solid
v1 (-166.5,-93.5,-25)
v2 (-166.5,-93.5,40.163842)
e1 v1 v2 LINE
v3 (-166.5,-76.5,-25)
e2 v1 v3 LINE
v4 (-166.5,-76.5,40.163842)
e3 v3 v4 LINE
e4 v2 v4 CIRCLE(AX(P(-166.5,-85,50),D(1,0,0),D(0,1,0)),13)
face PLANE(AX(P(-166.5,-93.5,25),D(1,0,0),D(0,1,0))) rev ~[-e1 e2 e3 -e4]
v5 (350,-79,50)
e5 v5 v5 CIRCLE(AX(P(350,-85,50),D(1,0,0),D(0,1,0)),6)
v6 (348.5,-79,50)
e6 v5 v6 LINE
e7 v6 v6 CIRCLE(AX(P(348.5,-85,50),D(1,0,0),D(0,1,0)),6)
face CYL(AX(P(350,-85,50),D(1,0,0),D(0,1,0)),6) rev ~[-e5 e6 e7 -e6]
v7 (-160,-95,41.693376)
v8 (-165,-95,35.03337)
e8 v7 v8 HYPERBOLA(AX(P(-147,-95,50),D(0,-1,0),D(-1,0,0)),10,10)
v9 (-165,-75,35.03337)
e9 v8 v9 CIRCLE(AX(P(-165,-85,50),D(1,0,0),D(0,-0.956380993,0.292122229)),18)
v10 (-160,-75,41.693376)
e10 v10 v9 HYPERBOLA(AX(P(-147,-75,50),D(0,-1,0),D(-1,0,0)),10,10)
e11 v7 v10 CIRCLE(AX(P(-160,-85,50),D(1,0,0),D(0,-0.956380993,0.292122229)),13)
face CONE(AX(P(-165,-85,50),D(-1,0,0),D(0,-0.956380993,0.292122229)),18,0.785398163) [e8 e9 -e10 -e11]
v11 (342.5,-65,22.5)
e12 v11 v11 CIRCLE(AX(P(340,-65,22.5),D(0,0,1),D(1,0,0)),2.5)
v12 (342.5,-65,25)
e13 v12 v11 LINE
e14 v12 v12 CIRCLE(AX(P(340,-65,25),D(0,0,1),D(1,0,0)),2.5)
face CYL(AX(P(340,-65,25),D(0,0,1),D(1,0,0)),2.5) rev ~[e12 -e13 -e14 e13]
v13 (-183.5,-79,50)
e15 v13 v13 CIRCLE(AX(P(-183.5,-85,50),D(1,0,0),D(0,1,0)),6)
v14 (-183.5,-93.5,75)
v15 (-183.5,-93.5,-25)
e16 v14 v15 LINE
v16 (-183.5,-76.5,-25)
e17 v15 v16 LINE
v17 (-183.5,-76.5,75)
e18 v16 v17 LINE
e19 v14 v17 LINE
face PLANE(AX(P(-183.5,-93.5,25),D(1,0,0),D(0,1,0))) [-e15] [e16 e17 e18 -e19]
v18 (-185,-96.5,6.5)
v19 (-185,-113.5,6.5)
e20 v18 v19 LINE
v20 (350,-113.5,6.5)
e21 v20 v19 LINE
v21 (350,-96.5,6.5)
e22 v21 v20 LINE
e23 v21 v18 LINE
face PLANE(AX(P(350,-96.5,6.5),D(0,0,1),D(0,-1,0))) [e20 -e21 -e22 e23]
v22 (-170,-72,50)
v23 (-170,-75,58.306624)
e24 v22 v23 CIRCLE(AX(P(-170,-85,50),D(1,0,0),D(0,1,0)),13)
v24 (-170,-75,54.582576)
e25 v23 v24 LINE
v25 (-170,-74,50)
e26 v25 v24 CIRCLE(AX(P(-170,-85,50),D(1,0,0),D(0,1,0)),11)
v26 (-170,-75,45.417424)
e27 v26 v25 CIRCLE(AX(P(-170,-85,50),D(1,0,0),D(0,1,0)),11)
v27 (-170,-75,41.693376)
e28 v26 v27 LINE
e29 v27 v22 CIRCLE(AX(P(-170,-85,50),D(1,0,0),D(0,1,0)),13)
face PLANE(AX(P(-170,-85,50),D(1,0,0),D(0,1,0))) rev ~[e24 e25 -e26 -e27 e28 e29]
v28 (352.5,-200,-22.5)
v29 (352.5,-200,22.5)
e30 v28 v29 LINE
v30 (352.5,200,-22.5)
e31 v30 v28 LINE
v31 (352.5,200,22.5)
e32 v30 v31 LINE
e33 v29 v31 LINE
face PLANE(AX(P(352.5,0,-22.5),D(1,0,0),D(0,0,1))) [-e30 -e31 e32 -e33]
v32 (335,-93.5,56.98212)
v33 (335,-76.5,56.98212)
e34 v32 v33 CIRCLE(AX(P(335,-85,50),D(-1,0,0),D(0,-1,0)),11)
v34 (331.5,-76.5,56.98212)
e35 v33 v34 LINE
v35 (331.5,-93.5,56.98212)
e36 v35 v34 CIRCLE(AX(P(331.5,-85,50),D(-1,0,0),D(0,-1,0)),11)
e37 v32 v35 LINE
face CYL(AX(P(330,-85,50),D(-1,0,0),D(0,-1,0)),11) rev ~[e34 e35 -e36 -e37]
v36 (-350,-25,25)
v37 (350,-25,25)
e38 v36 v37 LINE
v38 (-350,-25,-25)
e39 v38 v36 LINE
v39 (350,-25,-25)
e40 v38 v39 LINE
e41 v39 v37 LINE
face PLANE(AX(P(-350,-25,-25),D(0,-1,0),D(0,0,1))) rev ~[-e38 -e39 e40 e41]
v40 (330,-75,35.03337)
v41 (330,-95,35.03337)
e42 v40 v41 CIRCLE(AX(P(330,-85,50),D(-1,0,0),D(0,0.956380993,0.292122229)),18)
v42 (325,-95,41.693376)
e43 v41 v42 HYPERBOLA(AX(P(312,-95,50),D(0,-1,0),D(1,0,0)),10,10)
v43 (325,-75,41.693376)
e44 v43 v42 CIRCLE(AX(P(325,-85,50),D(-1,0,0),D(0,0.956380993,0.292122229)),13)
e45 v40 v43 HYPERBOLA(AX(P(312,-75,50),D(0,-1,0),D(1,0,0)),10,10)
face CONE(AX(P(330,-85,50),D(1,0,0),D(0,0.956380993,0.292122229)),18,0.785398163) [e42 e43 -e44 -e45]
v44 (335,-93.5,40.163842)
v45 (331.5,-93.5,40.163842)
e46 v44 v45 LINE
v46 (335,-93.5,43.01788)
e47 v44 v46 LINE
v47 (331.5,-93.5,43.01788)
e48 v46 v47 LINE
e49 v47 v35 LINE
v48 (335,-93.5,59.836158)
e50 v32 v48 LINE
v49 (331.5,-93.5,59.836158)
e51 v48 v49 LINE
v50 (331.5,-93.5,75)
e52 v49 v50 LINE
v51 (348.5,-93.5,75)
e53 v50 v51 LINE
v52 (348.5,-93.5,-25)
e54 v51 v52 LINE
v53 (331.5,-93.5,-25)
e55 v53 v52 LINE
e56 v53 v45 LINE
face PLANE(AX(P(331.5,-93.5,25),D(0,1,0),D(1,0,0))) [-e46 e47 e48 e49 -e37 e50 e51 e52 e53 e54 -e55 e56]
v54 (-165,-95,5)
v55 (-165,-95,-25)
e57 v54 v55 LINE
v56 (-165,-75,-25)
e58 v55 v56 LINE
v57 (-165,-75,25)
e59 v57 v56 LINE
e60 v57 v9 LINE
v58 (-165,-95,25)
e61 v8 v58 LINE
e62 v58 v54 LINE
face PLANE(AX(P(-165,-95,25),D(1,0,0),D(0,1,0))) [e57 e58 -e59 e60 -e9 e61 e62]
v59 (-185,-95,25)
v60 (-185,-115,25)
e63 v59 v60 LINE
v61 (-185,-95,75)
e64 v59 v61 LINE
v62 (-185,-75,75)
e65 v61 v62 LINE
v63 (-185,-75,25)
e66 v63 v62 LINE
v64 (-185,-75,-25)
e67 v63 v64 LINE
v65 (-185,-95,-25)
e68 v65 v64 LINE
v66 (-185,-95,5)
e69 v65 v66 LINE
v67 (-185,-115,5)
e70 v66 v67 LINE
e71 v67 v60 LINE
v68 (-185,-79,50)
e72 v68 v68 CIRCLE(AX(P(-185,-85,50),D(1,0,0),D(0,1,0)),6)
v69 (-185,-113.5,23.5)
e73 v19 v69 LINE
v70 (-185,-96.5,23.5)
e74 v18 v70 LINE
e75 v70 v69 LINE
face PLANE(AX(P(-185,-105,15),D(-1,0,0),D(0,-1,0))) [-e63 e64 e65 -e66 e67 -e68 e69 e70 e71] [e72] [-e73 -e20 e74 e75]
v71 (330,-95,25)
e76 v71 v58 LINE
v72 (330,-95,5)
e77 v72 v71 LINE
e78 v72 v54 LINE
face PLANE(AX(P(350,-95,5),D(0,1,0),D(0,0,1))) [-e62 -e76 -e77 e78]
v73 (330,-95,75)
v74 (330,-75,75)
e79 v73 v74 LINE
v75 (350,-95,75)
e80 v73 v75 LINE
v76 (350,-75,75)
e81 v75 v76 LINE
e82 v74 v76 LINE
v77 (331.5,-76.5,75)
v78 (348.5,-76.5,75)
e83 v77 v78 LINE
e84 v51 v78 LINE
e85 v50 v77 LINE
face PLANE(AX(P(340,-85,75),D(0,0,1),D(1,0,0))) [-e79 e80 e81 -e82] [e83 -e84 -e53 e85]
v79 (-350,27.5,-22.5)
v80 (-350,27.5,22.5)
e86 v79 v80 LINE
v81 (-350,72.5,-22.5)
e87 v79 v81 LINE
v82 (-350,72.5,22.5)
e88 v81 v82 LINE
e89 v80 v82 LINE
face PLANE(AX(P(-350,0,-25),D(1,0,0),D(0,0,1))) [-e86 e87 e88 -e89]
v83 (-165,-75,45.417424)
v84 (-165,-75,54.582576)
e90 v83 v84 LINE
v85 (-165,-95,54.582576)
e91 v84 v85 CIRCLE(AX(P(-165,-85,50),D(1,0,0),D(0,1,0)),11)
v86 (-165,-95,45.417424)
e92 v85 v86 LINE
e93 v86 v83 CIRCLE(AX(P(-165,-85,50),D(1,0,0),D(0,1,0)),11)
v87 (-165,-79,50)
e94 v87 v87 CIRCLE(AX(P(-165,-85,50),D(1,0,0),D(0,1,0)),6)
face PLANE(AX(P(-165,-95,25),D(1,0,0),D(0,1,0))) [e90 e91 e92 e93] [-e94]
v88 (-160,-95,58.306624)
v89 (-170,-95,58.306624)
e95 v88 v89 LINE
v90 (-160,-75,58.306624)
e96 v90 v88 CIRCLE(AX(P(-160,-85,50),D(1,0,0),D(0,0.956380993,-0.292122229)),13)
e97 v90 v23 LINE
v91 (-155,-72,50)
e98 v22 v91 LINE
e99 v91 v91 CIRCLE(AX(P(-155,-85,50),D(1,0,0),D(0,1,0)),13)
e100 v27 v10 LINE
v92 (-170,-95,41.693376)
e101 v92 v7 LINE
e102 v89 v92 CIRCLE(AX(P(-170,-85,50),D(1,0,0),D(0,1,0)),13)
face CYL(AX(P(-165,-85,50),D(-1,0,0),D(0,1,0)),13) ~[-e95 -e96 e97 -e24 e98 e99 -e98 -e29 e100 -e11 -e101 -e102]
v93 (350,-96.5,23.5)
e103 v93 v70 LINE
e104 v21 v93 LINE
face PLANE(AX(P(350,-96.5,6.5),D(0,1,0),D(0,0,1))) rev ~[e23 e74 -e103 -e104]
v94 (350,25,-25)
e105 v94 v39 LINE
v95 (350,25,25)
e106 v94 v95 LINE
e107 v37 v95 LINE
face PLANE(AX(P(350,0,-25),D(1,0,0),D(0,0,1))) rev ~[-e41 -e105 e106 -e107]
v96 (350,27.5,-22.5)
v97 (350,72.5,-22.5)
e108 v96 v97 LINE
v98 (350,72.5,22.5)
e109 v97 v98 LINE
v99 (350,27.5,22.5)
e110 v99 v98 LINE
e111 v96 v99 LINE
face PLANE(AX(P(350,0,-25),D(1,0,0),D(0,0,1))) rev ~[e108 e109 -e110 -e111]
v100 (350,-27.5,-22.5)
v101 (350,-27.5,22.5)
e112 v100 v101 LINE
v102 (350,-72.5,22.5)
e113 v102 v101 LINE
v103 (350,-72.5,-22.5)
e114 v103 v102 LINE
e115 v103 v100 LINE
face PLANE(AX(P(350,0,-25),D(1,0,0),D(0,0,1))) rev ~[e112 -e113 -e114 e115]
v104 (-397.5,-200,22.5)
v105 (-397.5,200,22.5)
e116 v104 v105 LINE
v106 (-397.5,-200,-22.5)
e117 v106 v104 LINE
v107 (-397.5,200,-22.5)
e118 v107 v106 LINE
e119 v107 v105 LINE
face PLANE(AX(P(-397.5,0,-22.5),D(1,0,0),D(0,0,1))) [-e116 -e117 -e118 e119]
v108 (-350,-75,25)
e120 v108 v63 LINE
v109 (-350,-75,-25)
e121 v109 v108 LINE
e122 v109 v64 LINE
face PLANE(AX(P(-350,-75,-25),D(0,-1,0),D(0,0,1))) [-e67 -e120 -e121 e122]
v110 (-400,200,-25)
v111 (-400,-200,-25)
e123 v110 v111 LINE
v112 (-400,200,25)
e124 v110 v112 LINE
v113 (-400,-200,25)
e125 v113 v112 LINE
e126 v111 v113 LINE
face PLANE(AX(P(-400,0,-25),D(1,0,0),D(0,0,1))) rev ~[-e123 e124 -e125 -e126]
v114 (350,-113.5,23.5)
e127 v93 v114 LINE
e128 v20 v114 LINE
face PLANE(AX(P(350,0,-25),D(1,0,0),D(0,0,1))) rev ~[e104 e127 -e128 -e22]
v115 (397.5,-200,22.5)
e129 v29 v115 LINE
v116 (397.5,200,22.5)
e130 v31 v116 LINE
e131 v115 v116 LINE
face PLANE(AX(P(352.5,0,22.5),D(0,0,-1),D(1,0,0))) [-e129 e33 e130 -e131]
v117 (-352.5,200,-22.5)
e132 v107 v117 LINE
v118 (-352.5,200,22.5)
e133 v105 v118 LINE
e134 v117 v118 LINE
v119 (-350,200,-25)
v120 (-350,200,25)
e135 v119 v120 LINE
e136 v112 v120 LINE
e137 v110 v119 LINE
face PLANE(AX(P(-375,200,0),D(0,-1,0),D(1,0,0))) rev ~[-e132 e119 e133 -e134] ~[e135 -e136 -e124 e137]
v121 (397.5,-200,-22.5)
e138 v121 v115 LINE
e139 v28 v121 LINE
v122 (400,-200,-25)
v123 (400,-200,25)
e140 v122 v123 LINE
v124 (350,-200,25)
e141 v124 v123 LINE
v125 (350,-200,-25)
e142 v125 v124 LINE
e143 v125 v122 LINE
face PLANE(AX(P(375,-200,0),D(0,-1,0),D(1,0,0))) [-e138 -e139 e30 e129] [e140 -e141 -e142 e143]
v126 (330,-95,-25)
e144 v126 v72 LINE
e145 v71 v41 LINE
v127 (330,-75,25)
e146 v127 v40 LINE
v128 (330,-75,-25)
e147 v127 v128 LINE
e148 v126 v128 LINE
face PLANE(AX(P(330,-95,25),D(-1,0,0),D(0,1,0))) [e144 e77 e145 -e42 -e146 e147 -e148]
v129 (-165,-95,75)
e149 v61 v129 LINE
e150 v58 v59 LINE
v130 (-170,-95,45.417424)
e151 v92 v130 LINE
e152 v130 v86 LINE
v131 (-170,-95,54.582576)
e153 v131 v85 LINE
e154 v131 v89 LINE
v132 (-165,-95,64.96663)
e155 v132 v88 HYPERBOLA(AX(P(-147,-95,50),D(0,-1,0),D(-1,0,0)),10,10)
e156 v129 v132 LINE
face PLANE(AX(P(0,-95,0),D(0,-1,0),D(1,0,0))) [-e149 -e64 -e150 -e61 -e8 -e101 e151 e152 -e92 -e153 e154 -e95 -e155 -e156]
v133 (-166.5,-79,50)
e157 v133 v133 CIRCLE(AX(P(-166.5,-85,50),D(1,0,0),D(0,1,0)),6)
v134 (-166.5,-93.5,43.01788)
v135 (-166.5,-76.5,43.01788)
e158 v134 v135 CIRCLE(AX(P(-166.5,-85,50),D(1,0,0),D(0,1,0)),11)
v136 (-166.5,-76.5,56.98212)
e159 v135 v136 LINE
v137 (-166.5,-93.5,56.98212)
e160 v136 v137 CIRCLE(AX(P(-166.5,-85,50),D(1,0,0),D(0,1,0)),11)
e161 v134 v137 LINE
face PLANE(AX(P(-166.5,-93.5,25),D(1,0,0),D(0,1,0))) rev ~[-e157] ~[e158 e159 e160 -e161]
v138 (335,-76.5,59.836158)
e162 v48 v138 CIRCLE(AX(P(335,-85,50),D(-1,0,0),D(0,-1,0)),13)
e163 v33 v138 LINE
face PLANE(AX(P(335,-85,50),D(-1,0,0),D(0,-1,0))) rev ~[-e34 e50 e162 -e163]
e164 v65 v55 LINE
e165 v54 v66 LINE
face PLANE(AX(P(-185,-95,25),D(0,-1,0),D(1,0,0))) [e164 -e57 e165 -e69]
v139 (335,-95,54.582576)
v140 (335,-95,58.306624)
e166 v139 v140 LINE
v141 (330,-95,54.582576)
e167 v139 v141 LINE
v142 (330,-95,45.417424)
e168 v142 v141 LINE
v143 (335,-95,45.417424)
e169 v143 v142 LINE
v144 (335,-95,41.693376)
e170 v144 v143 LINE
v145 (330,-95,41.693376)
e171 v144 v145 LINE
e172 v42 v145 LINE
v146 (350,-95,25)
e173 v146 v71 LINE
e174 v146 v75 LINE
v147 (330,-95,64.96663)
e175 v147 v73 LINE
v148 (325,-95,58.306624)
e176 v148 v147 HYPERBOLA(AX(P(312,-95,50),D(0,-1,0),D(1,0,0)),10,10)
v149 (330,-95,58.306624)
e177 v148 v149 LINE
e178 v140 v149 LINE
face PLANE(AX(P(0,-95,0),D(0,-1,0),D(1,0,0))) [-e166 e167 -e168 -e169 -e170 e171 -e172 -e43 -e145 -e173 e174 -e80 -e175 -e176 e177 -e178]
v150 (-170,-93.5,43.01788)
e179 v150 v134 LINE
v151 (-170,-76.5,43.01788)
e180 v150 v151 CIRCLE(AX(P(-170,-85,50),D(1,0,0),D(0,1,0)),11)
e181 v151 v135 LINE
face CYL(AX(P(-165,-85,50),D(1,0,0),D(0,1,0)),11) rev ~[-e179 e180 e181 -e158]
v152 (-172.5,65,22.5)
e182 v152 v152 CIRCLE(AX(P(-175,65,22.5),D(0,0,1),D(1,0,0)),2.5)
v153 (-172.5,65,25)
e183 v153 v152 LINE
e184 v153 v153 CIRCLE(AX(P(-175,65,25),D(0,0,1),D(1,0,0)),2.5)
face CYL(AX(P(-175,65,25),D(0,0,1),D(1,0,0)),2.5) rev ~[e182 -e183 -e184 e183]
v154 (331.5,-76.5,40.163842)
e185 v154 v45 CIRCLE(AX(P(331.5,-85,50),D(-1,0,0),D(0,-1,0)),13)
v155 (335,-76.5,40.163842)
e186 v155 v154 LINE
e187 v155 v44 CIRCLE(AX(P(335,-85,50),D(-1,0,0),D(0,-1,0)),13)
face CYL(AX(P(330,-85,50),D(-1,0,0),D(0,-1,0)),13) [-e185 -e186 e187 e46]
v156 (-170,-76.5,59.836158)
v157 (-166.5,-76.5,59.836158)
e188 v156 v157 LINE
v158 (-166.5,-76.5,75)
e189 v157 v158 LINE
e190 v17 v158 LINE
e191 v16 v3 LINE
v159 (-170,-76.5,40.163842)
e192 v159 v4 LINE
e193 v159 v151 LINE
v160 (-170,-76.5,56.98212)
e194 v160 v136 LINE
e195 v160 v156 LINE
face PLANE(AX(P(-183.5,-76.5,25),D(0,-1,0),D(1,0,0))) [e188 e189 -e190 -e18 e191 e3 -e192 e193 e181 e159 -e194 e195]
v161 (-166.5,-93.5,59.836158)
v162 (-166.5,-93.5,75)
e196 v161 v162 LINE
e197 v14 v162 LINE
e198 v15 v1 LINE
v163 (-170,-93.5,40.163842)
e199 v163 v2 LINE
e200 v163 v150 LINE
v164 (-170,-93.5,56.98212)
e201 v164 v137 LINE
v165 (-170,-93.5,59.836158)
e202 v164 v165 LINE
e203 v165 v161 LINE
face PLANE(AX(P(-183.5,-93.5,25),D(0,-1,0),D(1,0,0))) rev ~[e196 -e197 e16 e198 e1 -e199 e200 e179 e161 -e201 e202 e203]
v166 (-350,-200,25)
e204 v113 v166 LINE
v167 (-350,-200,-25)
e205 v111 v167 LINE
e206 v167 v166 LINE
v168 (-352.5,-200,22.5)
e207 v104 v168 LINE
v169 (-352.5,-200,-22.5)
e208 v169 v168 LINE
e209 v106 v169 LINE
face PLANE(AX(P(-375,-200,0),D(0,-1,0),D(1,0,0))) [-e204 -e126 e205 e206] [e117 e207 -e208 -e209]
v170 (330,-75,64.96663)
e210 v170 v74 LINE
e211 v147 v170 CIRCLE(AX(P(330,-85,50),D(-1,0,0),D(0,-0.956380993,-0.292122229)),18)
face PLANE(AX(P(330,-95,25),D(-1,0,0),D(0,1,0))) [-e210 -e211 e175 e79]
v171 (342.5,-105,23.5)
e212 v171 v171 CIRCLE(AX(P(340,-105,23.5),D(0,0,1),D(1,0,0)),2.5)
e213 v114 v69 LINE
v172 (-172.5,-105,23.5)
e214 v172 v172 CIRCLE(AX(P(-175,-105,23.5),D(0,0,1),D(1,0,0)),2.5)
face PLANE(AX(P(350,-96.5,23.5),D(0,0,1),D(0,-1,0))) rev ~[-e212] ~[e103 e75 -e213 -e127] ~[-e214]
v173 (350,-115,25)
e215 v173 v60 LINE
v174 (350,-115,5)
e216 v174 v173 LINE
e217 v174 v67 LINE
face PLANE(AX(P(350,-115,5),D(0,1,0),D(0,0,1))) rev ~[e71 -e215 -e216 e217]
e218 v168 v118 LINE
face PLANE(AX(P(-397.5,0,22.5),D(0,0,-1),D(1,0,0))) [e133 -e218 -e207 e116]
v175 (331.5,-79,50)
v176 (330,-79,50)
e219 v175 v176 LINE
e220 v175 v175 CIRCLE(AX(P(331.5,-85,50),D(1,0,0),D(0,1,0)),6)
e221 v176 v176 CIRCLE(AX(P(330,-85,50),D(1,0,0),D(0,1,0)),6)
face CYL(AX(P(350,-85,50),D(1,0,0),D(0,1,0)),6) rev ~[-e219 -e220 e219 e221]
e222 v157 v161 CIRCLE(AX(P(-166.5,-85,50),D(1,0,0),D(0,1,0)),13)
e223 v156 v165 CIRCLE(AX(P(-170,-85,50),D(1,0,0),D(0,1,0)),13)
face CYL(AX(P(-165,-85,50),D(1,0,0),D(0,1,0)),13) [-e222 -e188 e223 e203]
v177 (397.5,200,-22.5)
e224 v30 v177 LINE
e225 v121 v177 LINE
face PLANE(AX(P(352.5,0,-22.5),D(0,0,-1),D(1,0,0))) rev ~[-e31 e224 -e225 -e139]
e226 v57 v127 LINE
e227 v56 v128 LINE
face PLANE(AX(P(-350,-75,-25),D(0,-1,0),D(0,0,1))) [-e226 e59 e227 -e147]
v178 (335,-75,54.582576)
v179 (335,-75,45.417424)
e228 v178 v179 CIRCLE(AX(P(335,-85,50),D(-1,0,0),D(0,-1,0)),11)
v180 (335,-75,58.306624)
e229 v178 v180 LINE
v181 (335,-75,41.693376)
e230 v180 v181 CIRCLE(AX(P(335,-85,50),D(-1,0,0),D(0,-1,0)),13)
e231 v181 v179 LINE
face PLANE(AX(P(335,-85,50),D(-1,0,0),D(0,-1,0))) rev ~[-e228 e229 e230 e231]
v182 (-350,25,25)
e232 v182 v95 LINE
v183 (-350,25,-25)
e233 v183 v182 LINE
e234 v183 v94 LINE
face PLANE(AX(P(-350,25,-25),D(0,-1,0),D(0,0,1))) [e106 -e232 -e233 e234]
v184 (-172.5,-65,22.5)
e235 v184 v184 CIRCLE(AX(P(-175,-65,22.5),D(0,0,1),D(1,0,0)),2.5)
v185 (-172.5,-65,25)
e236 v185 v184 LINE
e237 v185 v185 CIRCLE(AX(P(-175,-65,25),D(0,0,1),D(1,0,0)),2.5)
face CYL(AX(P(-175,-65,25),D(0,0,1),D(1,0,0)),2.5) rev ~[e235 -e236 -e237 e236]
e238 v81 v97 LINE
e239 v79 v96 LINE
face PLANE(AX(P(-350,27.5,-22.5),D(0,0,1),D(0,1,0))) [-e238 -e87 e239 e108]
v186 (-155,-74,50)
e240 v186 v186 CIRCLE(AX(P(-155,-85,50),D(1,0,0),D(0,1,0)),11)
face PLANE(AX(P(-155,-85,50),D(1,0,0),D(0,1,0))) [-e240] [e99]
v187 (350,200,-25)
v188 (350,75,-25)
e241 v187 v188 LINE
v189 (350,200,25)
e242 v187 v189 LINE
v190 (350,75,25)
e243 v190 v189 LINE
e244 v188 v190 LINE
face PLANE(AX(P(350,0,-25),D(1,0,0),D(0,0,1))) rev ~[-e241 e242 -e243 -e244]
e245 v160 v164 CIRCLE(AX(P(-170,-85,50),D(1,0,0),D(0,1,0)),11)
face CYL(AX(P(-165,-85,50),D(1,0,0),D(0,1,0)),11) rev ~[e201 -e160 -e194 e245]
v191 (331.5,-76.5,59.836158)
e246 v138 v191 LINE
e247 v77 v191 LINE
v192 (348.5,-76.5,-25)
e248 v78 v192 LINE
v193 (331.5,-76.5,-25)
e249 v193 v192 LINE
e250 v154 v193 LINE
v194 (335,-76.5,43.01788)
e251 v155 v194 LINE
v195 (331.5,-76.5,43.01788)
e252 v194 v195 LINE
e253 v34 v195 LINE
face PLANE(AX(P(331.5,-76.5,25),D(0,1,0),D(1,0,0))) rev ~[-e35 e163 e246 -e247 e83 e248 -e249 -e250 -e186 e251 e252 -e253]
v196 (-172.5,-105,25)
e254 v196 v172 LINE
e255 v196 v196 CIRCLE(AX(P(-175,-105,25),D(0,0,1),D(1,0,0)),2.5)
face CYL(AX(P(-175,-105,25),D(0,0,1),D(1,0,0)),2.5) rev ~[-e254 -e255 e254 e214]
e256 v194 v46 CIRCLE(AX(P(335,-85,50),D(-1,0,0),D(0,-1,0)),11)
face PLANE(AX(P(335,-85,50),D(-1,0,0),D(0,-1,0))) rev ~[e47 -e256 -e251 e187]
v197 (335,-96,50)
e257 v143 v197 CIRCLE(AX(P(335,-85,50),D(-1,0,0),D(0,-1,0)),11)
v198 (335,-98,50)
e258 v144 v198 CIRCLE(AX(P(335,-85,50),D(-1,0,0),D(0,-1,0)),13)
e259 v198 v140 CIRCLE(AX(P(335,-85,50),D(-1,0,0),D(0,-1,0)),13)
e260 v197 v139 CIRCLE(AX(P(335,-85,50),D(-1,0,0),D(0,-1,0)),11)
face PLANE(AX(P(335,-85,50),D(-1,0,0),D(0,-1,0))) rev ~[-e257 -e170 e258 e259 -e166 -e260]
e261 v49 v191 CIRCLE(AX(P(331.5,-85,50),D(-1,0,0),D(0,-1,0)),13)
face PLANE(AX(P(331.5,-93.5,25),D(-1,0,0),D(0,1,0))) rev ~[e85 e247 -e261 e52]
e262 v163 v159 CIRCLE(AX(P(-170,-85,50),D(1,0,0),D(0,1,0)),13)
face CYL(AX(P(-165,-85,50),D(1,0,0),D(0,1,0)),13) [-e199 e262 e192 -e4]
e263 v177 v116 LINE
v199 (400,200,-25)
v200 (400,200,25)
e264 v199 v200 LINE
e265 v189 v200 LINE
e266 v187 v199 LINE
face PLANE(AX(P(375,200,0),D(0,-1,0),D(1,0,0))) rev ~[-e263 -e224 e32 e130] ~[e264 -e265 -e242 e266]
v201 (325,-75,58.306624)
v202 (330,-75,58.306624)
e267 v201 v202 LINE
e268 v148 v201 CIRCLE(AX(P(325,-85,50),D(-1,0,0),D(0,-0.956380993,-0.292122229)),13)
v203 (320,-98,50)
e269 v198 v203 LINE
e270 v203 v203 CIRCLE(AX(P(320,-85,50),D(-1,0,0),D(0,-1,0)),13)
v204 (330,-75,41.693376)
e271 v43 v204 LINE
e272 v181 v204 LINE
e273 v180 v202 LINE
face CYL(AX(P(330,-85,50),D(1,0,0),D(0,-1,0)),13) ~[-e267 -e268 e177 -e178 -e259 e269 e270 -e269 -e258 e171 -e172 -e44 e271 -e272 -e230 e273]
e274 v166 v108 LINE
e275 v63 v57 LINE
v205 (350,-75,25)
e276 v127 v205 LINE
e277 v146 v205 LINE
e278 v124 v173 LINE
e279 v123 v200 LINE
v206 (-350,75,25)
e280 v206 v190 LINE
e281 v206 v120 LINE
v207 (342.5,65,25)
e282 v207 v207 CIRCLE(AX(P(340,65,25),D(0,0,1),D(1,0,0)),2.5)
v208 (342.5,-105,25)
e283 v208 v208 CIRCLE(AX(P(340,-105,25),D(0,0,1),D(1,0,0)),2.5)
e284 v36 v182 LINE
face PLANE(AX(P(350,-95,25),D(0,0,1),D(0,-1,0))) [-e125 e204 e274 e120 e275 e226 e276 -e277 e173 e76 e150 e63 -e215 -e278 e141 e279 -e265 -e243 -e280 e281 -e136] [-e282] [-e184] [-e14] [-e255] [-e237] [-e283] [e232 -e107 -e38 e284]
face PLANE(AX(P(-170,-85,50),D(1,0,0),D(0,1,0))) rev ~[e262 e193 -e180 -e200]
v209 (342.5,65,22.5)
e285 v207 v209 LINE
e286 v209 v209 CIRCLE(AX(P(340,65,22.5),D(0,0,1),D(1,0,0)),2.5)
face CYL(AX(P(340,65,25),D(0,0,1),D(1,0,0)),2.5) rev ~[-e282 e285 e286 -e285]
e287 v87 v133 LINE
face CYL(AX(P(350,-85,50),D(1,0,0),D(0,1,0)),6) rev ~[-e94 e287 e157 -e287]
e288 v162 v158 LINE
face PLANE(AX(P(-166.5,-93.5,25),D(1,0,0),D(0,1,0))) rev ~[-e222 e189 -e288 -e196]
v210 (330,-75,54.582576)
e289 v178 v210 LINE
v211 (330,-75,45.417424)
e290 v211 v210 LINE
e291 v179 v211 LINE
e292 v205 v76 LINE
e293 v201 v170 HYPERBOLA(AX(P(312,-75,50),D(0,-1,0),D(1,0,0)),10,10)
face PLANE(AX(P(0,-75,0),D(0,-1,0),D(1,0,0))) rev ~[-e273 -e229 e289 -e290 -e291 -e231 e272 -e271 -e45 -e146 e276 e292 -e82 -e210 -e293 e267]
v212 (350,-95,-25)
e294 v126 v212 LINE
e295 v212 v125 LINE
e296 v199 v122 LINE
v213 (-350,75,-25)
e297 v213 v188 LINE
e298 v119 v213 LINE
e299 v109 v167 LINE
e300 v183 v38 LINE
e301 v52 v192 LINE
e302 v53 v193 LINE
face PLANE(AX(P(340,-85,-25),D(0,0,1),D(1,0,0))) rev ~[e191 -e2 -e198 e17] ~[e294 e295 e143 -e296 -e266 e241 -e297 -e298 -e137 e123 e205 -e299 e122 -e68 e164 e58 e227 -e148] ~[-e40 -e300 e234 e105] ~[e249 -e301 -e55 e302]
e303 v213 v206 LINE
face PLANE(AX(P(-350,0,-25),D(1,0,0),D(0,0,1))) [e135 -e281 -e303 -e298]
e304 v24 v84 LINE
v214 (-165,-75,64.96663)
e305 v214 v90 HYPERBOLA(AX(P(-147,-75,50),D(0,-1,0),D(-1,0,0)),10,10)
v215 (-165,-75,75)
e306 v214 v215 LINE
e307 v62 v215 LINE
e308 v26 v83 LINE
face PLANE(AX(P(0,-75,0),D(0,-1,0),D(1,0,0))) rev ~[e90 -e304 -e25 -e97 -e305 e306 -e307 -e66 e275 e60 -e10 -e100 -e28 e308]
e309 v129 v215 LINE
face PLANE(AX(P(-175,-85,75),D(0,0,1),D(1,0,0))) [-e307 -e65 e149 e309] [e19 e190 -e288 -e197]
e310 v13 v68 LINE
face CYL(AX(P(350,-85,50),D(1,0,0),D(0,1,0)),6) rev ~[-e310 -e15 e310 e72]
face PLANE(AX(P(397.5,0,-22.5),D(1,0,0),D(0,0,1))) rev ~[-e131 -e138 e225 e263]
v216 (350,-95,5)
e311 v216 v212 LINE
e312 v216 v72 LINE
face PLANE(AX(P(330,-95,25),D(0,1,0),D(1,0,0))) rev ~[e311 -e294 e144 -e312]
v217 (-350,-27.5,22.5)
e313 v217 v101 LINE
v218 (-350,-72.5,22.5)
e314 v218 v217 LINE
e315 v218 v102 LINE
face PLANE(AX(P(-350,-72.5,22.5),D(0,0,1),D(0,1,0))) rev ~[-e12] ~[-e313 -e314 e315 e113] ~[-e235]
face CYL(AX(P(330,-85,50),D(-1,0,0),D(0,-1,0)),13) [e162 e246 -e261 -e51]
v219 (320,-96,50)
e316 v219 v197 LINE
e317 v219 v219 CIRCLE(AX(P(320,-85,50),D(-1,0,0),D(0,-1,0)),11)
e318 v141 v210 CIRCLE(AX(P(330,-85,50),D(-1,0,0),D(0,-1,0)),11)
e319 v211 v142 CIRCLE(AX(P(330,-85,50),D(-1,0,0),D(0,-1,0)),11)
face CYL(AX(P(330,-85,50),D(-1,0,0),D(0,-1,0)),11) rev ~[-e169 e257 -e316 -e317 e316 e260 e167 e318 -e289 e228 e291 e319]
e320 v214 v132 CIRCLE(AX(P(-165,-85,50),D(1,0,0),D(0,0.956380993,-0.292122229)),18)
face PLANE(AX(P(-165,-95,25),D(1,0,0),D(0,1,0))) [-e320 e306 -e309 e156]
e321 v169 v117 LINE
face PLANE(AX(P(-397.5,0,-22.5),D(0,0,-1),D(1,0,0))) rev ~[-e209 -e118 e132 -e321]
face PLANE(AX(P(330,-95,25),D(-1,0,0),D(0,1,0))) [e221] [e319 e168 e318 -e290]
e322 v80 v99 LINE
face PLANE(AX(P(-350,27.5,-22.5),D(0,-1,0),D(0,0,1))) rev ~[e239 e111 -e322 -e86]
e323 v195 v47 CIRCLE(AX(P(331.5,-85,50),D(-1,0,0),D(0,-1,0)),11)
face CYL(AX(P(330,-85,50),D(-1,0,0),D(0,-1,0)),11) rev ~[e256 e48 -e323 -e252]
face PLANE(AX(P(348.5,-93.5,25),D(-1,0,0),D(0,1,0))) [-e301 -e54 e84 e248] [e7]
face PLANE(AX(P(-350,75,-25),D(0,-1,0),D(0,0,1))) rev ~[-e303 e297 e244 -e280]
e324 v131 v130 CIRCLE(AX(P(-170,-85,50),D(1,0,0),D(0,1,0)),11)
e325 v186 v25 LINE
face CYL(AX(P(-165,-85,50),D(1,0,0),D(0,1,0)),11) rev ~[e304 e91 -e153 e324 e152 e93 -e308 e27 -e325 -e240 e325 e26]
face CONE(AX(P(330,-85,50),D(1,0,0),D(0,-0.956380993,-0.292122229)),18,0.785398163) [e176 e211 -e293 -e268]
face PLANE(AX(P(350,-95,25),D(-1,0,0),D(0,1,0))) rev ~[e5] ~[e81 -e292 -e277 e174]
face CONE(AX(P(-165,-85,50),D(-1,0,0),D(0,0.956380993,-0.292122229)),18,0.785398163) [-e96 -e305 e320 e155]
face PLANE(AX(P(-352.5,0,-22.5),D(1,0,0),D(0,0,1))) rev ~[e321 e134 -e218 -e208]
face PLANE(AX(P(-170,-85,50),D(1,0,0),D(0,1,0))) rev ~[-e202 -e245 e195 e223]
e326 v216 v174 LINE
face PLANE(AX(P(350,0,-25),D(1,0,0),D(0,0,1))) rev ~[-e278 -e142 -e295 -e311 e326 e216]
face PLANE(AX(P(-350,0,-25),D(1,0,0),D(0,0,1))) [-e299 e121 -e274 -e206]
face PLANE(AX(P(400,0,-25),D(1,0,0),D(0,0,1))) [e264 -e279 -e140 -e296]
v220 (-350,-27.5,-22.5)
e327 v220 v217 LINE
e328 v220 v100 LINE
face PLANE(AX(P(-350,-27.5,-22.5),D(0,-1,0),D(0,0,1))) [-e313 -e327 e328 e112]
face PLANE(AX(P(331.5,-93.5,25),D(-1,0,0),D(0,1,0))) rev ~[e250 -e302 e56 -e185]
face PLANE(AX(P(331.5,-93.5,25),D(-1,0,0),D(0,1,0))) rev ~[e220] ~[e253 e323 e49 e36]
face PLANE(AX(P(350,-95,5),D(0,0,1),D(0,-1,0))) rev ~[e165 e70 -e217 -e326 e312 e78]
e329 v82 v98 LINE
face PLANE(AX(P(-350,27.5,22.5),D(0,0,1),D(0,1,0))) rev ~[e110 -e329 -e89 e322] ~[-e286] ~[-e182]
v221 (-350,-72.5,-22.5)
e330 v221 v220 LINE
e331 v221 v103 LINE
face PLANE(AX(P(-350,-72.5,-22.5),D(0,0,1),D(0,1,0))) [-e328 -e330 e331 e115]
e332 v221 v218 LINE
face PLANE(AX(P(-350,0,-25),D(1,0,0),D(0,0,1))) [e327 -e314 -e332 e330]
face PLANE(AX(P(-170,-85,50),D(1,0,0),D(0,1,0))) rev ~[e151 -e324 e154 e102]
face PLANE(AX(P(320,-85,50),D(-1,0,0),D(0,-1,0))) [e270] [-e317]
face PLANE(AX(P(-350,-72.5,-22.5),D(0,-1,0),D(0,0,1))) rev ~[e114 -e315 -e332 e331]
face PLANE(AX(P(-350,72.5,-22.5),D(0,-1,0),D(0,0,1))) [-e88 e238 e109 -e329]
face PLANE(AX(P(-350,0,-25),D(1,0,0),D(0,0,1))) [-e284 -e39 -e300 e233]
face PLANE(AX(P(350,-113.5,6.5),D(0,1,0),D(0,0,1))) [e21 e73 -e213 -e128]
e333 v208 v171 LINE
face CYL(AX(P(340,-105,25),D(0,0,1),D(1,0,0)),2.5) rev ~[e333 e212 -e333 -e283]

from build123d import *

# Parameters (mm, degrees)
F0_W          = 50
F0_H          = 50
F0_W_2        = 45
F0_H_2        = 45
F1_DEPTH      = 200
F2_W          = 50
F2_H          = 50
F2_W_2        = 45
F2_H_2        = 45
F3_DEPTH      = 700
F4_W          = 20
F4_H          = 20
F4_W_2        = 17
F4_H_2        = 17
F5_DEPTH      = 50
F6_DEPTH      = 50
F7_W          = 20
F7_H          = 20
F7_W_2        = 17
F7_H_2        = 17
F8_DEPTH      = 535
F9_R          = 6
F10_DEPTH     = 750.001
F11_R         = 13
F11_R_2       = 11
F12_DEPTH     = 10
F13_DEPTH     = 5
F14_R         = 13
F14_R_2       = 11
F15_DEPTH     = 10
F16_DEPTH     = 5
F17_T4_ANGLE  = 213.9701071651
F17_T10_ANGLE = 213.9701071651
F17_T16_ANGLE = 213.9701071651
F17_T22_ANGLE = 213.9701071651
F18_R         = 2.5
F19_DEPTH     = 10


# Not quite as in the source:
# - a fillet or chamfer that OpenCascade refuses, or shapes differently, is made with other operations: its cross-section is extruded or revolved along the edge and cut away or added


with BuildPart() as f1:
    # F0 (on Front) → F1 (new body, symmetric)
    with BuildSketch(Plane.XZ):
        with Locations((-375, 0)):
            Rectangle(F0_W, F0_H)
        with Locations((-375, 0)):
            Rectangle(F0_W_2, F0_H_2, mode=Mode.SUBTRACT)
    extrude(amount=F1_DEPTH, both=True)



with BuildPart() as f1b:
    # F0 (on Front) → F1, piece 2 (new body, symmetric)
    with BuildSketch(Plane.XZ):
        with Locations((375, 0)):
            Rectangle(F0_W, F0_H)
        with Locations((375, 0)):
            Rectangle(F0_W_2, F0_H_2, mode=Mode.SUBTRACT)
    extrude(amount=F1_DEPTH, both=True)


with BuildPart() as f1_1:
    add(f1.part)

    add(f1b.part)  # F3 merges F1b
    # F2 (on face) → F3 (join, through all)
    with BuildSketch(Plane.YZ.offset(-350)):
        with Locations((50, 0)):
            Rectangle(F2_W, F2_H)
        with Locations((50, 0)):
            Rectangle(F2_W_2, F2_H_2, mode=Mode.SUBTRACT)
        with Locations((-50, 0)):
            Rectangle(F2_W, F2_H)
        with Locations((-50, 0)):
            Rectangle(F2_W_2, F2_H_2, mode=Mode.SUBTRACT)
    extrude(amount=F3_DEPTH)

    # F4 (on face) → F5 (join)
    with BuildSketch(Plane.XY.offset(25)):
        with Locations((340, -85)):
            Rectangle(F4_W, F4_H)
        with Locations((340, -85)):
            Rectangle(F4_W_2, F4_H_2, mode=Mode.SUBTRACT)
        with Locations((-175, -85)):
            Rectangle(F4_W, F4_H)
        with Locations((-175, -85)):
            Rectangle(F4_W_2, F4_H_2, mode=Mode.SUBTRACT)
    extrude(amount=-F5_DEPTH)

    # F4 (on face) → F6 (join)
    with BuildSketch(Plane.XY.offset(25)):
        with Locations((340, -85)):
            Rectangle(F4_W, F4_H)
        with Locations((340, -85)):
            Rectangle(F4_W_2, F4_H_2, mode=Mode.SUBTRACT)
        with Locations((-175, -85)):
            Rectangle(F4_W, F4_H)
        with Locations((-175, -85)):
            Rectangle(F4_W_2, F4_H_2, mode=Mode.SUBTRACT)
    extrude(amount=F6_DEPTH)

    # F7 (on face) → F8 (join)
    with BuildSketch(Plane(origin=(350, 0, 0), x_dir=(0, -1, 0), z_dir=(-1, 0, 0))):
        with Locations((105, 15)):
            Rectangle(F7_W, F7_H)
        with Locations((105, 15)):
            Rectangle(F7_W_2, F7_H_2, mode=Mode.SUBTRACT)
    extrude(amount=F8_DEPTH)

    # F9 (on face) → F10 (cut, through all)
    with BuildSketch(Plane.YZ.offset(350)):
        with Locations((-85, 50)):
            Circle(F9_R)
    extrude(amount=-F10_DEPTH, mode=Mode.SUBTRACT)

    # F11 (on face) → F12 (join)
    with BuildSketch(Plane(origin=(330, 0, 0), x_dir=(0, -1, 0), z_dir=(-1, 0, 0))):
        with Locations((85, 50)):
            Circle(F11_R)
        with Locations((85, 50)):
            Circle(F11_R_2, mode=Mode.SUBTRACT)
    extrude(amount=F12_DEPTH)

    # F11 (on face) → F13 (join)
    with BuildSketch(Plane(origin=(330, 0, 0), x_dir=(0, -1, 0), z_dir=(-1, 0, 0))):
        with Locations((85, 50)):
            Circle(F11_R)
        with Locations((85, 50)):
            Circle(F11_R_2, mode=Mode.SUBTRACT)
    extrude(amount=-F13_DEPTH)

    # F14 (on face) → F15 (join)
    with BuildSketch(Plane.YZ.offset(-165)):
        with Locations((-85, 50)):
            Circle(F14_R)
        with Locations((-85, 50)):
            Circle(F14_R_2, mode=Mode.SUBTRACT)
    extrude(amount=F15_DEPTH)

    # F14 (on face) → F16 (join)
    with BuildSketch(Plane.YZ.offset(-165)):
        with Locations((-85, 50)):
            Circle(F14_R)
        with Locations((-85, 50)):
            Circle(F14_R_2, mode=Mode.SUBTRACT)
    extrude(amount=-F16_DEPTH)

    # F17: chamfer of 5 on 10 edges, made by hand


with BuildPart() as f17_tool2:
    # F17_s3 → F17_t4 (revolve)
    with BuildSketch(Plane(origin=(0, 6.7154986509, 21.9859176279), x_dir=(1, 0, 0), z_dir=(0, 0.2921222291, 0.9563809927))):
        Polygon((-165, -113.8984958377), (-160, -108.8984958377), (-165, -108.8984958377), align=None)
    revolve(axis=Axis((-165, -85, 50), (1, 0, 0)), revolution_arc=F17_T4_ANGLE)

    split(bisect_by=Plane.XZ.offset(75), keep=Keep.TOP)

    split(bisect_by=Plane.XZ.offset(95), keep=Keep.BOTTOM)


with BuildPart() as f1_2:
    add(f1_1.part)

    # F17_t1: union F17_tool2
    add(f17_tool2.part)


with BuildPart() as f17_tool8:
    # F17_s9 → F17_t10 (revolve)
    with BuildSketch(Plane(origin=(0, 6.7154986509, 21.9859176279), x_dir=(1, 0, 0), z_dir=(0, -0.2921222291, -0.9563809927))):
        Polygon((-165, 77.8984958377), (-160, 82.8984958377), (-165, 82.8984958377), align=None)
    revolve(axis=Axis((-165, -85, 50), (1, 0, 0)), revolution_arc=F17_T10_ANGLE)

    split(bisect_by=Plane.XZ.offset(75), keep=Keep.TOP)

    split(bisect_by=Plane.XZ.offset(95), keep=Keep.BOTTOM)


with BuildPart() as f1_3:
    add(f1_2.part)

    # F17_t7: union F17_tool8
    add(f17_tool8.part)


with BuildPart() as f17_tool14:
    # F17_s15 → F17_t16 (revolve)
    with BuildSketch(Plane(origin=(0, -21.2225160964, 69.4805426982), x_dir=(1, 0, 0), z_dir=(0, -0.2921222291, 0.9563809927))):
        Polygon((330, -48.686272927), (325, -53.686272927), (330, -53.686272927), align=None)
    revolve(axis=Axis((330, -85, 50), (-1, 0, 0)), revolution_arc=F17_T16_ANGLE)

    split(bisect_by=Plane.XZ.offset(75), keep=Keep.TOP)

    split(bisect_by=Plane.XZ.offset(95), keep=Keep.BOTTOM)


with BuildPart() as f1_4:
    add(f1_3.part)

    # F17_t13: union F17_tool14
    add(f17_tool14.part)


with BuildPart() as f17_tool20:
    # F17_s21 → F17_t22 (revolve)
    with BuildSketch(Plane(origin=(0, -21.2225160964, 69.4805426982), x_dir=(1, 0, 0), z_dir=(0, 0.2921222291, -0.9563809927))):
        Polygon((330, 84.686272927), (325, 79.686272927), (330, 79.686272927), align=None)
    revolve(axis=Axis((330, -85, 50), (-1, 0, 0)), revolution_arc=F17_T22_ANGLE)

    split(bisect_by=Plane.XZ.offset(75), keep=Keep.TOP)

    split(bisect_by=Plane.XZ.offset(95), keep=Keep.BOTTOM)


with BuildPart() as f1_5:
    add(f1_4.part)

    # F17_t19: union F17_tool20
    add(f17_tool20.part)

    # F18 (on face) → F19 (cut)
    with BuildSketch(Plane.XY.offset(25)):
        with Locations((-175, -65)):
            Circle(F18_R)
        with Locations((-175, 65)):
            Circle(F18_R)
        with Locations((-175, -105)):
            Circle(F18_R)
        with Locations((340, -105)):
            Circle(F18_R)
        with Locations((340, -65)):
            Circle(F18_R)
        with Locations((340, 65)):
            Circle(F18_R)
    extrude(amount=-F19_DEPTH, mode=Mode.SUBTRACT)


solid = f1_5.part
